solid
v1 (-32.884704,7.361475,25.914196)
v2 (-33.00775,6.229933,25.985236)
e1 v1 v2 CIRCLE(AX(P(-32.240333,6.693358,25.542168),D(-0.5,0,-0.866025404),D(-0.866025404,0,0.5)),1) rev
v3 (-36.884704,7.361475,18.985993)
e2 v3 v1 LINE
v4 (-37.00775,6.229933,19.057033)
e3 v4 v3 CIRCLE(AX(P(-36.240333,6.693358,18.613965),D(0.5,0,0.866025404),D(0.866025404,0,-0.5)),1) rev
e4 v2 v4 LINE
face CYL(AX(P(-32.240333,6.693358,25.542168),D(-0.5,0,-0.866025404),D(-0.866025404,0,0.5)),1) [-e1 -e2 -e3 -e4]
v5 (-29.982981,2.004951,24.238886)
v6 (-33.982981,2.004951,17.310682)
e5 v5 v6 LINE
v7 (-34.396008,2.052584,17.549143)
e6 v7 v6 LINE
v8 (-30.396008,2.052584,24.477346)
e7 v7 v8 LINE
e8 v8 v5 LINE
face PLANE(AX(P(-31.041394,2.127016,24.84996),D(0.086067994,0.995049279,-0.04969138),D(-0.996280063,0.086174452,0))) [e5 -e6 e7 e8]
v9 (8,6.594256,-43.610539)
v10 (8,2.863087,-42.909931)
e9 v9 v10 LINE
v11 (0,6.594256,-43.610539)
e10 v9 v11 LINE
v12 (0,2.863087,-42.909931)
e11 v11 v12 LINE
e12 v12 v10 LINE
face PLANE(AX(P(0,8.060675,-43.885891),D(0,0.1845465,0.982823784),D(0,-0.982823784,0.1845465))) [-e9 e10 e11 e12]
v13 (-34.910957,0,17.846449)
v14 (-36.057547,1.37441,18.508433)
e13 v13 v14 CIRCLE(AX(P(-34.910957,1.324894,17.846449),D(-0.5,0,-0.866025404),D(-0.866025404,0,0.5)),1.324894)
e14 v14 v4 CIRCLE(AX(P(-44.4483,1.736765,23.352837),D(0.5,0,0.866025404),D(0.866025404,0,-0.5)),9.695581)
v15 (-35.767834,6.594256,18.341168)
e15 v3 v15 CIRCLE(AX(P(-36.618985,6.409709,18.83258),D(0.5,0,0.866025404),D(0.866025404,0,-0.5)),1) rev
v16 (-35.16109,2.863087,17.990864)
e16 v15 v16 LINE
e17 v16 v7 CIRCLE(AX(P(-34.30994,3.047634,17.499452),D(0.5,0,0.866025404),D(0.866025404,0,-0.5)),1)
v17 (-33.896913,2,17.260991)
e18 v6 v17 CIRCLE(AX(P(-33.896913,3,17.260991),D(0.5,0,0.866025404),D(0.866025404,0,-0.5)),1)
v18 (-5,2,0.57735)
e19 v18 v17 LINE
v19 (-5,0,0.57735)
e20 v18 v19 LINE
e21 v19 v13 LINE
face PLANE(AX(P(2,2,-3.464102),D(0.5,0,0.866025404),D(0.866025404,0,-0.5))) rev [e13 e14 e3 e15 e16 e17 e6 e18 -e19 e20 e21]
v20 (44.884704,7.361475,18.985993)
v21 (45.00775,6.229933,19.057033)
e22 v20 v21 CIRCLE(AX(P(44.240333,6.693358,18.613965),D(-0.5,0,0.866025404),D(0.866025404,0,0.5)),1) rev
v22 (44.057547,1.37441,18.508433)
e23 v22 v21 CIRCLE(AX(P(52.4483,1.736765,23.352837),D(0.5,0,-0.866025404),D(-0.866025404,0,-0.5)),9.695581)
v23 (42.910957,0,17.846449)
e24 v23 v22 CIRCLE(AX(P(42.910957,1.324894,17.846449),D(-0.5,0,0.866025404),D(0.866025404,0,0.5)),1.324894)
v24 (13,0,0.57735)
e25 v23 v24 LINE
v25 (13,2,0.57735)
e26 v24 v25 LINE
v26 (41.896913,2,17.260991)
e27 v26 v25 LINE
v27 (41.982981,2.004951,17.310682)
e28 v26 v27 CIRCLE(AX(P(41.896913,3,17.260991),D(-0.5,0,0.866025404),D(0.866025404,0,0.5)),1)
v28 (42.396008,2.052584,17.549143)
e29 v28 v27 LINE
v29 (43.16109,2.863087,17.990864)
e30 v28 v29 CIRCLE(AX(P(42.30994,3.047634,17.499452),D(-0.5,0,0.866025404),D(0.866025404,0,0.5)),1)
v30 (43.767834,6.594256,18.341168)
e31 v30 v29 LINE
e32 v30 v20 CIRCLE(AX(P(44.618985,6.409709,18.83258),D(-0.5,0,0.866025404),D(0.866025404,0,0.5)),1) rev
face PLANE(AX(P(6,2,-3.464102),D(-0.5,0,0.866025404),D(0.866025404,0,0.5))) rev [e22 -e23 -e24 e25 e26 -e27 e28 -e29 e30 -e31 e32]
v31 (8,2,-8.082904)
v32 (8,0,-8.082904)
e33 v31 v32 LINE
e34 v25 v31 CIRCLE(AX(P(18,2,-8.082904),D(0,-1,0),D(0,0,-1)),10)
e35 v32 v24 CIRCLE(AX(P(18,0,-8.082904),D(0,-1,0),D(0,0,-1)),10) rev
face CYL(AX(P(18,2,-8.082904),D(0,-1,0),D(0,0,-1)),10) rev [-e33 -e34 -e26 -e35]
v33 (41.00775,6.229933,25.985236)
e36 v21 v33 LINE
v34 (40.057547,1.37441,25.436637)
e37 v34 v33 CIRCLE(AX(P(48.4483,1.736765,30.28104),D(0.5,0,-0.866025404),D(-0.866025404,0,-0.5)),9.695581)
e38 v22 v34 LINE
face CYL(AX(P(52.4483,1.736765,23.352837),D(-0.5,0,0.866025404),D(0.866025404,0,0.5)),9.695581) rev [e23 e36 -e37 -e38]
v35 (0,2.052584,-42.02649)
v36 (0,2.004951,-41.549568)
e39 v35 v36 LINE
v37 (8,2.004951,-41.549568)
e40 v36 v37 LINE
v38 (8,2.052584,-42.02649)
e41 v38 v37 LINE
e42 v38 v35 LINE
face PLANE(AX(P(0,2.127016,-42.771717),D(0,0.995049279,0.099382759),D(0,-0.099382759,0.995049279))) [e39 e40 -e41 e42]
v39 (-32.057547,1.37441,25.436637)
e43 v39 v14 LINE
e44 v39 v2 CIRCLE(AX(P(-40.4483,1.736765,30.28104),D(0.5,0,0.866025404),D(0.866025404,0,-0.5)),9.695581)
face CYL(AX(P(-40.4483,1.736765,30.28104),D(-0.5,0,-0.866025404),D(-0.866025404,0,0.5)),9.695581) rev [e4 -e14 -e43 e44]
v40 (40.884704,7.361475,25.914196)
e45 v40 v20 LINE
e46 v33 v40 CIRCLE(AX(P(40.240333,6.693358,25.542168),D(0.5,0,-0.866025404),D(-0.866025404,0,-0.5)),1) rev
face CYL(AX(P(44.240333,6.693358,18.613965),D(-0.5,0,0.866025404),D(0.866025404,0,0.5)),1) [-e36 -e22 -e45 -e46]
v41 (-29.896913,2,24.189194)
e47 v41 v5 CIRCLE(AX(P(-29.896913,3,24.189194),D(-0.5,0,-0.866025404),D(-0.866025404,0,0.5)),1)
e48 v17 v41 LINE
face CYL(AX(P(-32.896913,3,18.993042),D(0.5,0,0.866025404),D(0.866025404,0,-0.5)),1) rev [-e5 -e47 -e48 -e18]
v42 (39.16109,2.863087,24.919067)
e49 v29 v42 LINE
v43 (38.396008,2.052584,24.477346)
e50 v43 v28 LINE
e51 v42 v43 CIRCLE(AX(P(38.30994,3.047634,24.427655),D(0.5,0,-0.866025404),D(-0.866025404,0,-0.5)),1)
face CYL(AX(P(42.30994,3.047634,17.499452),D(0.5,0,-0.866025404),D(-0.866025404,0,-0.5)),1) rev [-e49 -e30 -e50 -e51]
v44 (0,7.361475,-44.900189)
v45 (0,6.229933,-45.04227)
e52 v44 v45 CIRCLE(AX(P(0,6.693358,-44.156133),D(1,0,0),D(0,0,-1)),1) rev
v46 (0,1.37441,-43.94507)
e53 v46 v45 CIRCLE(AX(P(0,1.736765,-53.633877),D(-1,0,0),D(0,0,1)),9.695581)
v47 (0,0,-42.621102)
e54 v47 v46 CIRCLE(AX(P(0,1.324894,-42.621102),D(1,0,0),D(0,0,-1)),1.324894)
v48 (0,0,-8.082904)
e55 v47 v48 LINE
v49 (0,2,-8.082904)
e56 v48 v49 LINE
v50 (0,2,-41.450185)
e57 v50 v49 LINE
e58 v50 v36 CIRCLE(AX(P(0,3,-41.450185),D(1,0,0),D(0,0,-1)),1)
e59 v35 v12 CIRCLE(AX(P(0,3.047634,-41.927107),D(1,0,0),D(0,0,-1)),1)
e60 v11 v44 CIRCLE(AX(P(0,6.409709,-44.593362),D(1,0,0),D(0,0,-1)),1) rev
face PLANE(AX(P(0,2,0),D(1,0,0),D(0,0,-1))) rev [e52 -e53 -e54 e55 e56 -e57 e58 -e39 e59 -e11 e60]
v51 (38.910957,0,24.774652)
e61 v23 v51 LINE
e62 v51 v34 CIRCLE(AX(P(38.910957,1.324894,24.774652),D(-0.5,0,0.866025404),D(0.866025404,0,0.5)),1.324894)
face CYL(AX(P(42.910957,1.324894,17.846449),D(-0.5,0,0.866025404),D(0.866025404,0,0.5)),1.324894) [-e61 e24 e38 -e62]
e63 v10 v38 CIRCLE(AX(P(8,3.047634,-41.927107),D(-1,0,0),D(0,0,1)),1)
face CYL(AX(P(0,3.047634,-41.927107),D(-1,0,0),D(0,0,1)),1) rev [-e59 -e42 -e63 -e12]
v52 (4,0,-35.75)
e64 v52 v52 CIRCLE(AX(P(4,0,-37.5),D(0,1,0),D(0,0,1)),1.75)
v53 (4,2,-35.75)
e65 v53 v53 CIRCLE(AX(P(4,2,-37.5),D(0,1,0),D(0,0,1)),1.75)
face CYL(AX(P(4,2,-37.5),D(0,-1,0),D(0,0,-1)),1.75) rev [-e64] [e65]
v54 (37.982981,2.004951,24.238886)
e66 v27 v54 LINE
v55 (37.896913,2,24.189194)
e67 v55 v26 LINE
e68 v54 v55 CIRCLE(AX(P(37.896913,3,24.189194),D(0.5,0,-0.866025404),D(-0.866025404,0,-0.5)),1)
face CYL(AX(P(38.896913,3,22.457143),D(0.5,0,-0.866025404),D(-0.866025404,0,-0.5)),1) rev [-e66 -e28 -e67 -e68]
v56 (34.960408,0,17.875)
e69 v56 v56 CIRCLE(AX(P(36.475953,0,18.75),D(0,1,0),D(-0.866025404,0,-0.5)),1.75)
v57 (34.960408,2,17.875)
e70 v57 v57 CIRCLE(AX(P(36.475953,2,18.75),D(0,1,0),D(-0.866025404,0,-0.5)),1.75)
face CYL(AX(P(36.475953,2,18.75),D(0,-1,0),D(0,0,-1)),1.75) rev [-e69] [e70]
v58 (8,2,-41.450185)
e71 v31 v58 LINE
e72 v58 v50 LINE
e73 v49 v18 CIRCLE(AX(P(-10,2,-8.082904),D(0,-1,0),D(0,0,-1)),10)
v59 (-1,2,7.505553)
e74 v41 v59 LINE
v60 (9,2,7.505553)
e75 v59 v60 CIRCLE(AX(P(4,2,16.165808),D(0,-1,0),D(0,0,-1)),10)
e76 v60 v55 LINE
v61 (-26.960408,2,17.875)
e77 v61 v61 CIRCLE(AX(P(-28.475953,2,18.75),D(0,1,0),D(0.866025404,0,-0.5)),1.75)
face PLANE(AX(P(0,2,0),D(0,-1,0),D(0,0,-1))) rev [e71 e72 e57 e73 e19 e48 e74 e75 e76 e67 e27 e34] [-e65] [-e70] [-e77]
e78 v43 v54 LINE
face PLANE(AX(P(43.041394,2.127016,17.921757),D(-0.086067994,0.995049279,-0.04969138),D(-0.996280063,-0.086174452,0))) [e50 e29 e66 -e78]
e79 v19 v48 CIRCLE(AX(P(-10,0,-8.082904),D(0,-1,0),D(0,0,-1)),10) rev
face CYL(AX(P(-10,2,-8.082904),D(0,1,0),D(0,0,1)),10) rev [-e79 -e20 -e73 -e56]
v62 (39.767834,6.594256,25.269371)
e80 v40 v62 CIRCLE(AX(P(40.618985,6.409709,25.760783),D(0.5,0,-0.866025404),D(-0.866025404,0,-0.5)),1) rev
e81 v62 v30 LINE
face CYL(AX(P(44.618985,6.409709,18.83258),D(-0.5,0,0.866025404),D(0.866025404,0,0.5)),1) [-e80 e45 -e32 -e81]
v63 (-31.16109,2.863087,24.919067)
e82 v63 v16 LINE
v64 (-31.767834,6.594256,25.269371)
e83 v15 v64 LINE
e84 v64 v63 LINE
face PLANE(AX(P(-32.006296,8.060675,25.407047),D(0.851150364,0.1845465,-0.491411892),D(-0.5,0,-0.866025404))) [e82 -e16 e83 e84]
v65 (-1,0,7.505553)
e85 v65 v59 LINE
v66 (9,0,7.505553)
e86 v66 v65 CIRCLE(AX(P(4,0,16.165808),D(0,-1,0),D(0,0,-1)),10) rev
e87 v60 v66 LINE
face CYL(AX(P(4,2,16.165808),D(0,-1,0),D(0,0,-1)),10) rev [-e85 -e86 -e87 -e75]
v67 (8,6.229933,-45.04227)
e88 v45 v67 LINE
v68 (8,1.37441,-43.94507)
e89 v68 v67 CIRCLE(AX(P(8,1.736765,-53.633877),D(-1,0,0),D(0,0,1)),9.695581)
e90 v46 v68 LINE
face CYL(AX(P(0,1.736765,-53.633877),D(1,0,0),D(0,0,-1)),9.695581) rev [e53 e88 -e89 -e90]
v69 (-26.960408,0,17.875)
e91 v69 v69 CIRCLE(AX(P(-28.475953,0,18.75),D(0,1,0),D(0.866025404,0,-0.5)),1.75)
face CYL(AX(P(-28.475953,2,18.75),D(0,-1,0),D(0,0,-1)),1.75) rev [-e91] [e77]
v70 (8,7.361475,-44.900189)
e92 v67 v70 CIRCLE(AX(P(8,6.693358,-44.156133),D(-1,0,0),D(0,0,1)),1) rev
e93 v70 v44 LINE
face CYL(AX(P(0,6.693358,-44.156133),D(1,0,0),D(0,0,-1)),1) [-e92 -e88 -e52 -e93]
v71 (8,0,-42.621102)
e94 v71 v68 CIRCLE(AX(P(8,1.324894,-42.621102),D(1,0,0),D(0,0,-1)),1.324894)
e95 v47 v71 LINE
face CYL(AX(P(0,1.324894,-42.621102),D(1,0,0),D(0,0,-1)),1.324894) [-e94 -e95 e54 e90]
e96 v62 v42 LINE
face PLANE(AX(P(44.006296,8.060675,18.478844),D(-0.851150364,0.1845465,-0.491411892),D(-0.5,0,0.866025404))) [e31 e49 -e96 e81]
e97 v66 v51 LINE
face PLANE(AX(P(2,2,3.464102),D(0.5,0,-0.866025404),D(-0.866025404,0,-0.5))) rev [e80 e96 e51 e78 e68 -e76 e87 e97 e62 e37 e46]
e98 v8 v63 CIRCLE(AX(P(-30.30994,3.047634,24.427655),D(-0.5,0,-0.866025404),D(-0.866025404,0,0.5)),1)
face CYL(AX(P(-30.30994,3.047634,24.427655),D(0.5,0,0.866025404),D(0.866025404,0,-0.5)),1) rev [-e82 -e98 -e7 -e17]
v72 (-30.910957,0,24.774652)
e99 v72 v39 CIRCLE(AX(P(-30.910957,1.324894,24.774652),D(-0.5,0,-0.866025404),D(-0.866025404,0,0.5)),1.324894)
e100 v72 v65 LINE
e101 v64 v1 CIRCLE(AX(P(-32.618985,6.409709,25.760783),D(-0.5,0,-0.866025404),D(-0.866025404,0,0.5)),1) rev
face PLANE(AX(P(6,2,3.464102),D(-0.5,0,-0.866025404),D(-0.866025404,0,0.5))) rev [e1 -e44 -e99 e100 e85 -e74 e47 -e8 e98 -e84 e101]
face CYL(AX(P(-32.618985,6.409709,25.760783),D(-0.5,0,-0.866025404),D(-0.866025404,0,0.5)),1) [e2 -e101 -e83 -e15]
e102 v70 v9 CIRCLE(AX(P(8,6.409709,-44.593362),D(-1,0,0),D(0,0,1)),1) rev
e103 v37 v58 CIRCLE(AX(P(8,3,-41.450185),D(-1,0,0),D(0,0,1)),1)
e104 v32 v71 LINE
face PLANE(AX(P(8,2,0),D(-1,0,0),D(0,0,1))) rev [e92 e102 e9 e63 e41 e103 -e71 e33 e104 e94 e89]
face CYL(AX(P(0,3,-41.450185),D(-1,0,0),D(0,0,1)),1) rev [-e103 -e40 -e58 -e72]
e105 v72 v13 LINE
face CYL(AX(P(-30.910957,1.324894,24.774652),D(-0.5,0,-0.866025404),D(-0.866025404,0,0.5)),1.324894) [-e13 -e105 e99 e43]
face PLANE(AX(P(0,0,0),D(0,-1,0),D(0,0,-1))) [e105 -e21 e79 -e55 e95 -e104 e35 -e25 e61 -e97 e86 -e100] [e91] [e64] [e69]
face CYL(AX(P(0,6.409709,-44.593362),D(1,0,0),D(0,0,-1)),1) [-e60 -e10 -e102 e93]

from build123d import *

# Parameters (mm, degrees)
SKETCH1_W                = 8
SKETCH1_H                = 41.5
SKETCH1_R                = 1.75
BOSS_EXTRUDE2_DEPTH      = 2
CIRPATTERN1_COUNT        = 3
BOSS_EXTRUDE4_DEPTH      = 4
FILLET4_R                = 1
FILLET5_R                = 1
CIRPATTERN2_COUNT        = 3
FILLET4_OF_CIRPATTERN2_R = 1
FILLET5_OF_CIRPATTERN2_R = 1
FILLET6_R                = 10


with BuildPart() as part:
    # Sketch1 → Boss-Extrude2 (new body)
    with BuildSketch(Plane(origin=(0, 0, 0), x_dir=(1, 0, 0), z_dir=(0, 1, 0))):
        with Locations((4, 20.75)):
            Rectangle(SKETCH1_W, SKETCH1_H)
        with Locations(Location((4, 37.5, 0), (0, 0, 270))):
            Circle(SKETCH1_R, mode=Mode.SUBTRACT)
    boss_extrude2 = extrude(amount=BOSS_EXTRUDE2_DEPTH)

    # CirPattern1: Boss-Extrude2 ×3 about axis
    cirpattern1_axis = Axis((4, 0, 0), (0, 1, 0))
    for i in range(1, CIRPATTERN1_COUNT):
        add(boss_extrude2.rotate(cirpattern1_axis, i * 360 / CIRPATTERN1_COUNT))

    # Sketch8 → Boss-Extrude4 (add, symmetric)
    with BuildSketch(Plane(origin=(4, 0, 0), x_dir=(0, 0, -1), z_dir=(1, 0, 0))):
        with BuildLine():
            Line((41.5, 0), (42.621101534, 0))
            ThreePointArc((42.621101534, 0), (43.575288985, 0.405725605), (43.945070079, 1.374409713))
            ThreePointArc((43.945070079, 1.374409713), (44.287115262, 4.314035864), (45.5, 7.013537193))
            Line((45.5, 7.013537193), (43.885890552, 8.06067472))
            Line((43.885890552, 8.06067472), (42.771717246, 2.127015587))
            Line((42.771717246, 2.127015587), (41.5, 2))
            Line((41.5, 2), (41.5, 0))
        make_face()
    boss_extrude4 = extrude(amount=BOSS_EXTRUDE4_DEPTH, both=True)

    # Fillet4
    # the kernel refuses this fillet: 1 mm, written as the material it takes off along each edge
    with BuildSketch(Plane(origin=(11.730116112, 8.06067472, -43.885890552), x_dir=(0, -0.9828237835068792, 0.1845464997587953), z_dir=(-1, 0, 0))) as fillet4_piece_1:
        with BuildLine():
            CenterArc((FILLET4_R * 1.49204644486, -FILLET4_R), FILLET4_R, 90, 112.338398351)
            Line((FILLET4_R * 0.567091237268, -FILLET4_R * 1.38007612915), (0, 0))
            Line((0, 0), (FILLET4_R * 1.49204644486, 0))
        make_face()
    extrude(amount=15.460232224, mode=Mode.SUBTRACT)
    with BuildSketch(Plane(origin=(-2.382872769, 7.013537193, -45.5), x_dir=(0, 0.5442451052621637, 0.8389262574256311), z_dir=(1, 0, 0))) as fillet4_piece_2:
        with BuildLine():
            CenterArc((0.953149108, 1), FILLET4_R, 185.36479385, 84.63520615)
            ThreePointArc((-0.042470495, 0.906503441), (-0.010623444, 0.453748893), (0, 0))
            Line((0, 0), (0.953149108, 0))
        make_face()
    extrude(amount=12.765745538, mode=Mode.SUBTRACT)

    # Fillet5
    # the kernel refuses this fillet: 1 mm, written as the material it adds along each edge
    with BuildSketch(Plane(origin=(8, 2, -41.5), x_dir=(0, 0, 1), z_dir=(-1, 0, 0))) as fillet5_piece_1:
        with BuildLine():
            CenterArc((FILLET5_R * 0.0498146888591, FILLET5_R), FILLET5_R, 264.296371881, 5.703628119)
            Line((-FILLET5_R * 0.0495680702218, FILLET5_R * 0.00495072122158), (0, 0))
            Line((0, 0), (FILLET5_R * 0.0498146888591, 0))
        make_face()
    extrude(amount=8)
    with BuildSketch(Plane(origin=(8, 2.127015587, -42.771717246), x_dir=(0, 0.9828237835068792, -0.18454649975879509), z_dir=(-1, 0, 0))) as fillet5_piece_2:
        with BuildLine():
            CenterArc((FILLET5_R * 0.748935389987, -FILLET5_R), FILLET5_R, 90, 73.66167838)
            Line((-FILLET5_R * 0.210681966633, -FILLET5_R * 0.718691399219), (0, 0))
            Line((0, 0), (FILLET5_R * 0.748935389987, 0))
        make_face()
    extrude(amount=8)

    # CirPattern2: Boss-Extrude4 ×3 about axis
    cirpattern2_axis = Axis((4, 0, 0), (0, 1, 0))
    for i in range(1, CIRPATTERN2_COUNT):
        add(boss_extrude4.rotate(cirpattern2_axis, i * 360 / CIRPATTERN2_COUNT))

    # Fillet4 of CirPattern2
    # the kernel refuses this fillet: 1 mm, written as the material it takes off along each edge
    with BuildSketch(Plane(origin=(-37.871354141, 8.06067472, 15.248468348), x_dir=(-0.7265314508324002, -0.5442451052621637, 0.4194631287128154), z_dir=(0.49999999999999983, 0, 0.8660254037844388))) as fillet4_of_cirpattern2_piece_1:
        with BuildLine():
            CenterArc((FILLET4_OF_CIRPATTERN2_R * 1.49204644486, FILLET4_OF_CIRPATTERN2_R), FILLET4_OF_CIRPATTERN2_R, 157.661601649, 112.338398351)
            Line((FILLET4_OF_CIRPATTERN2_R * 0.567091237268, FILLET4_OF_CIRPATTERN2_R * 1.38007612915), (0, 0))
            Line((0, 0), (FILLET4_OF_CIRPATTERN2_R * 1.49204644486, 0))
        make_face()
    extrude(amount=15.460232224, mode=Mode.SUBTRACT)
    with BuildSketch(Plane(origin=(-32.212719488, 7.013537193, 28.277729967), x_dir=(0.43681230013054545, -0.8634774766062033, -0.2521936990657099), z_dir=(-0.49999999999999983, 0, -0.8660254037844388))) as fillet4_of_cirpattern2_piece_2:
        with BuildLine():
            CenterArc((0.954297344, -0.9989043), FILLET4_OF_CIRPATTERN2_R, 92.682396925, 84.63520615)
            Line((-0.044606957, -0.952104742), (0, 0))
            ThreePointArc((0, 0), (0.453748893, -0.010623444), (0.907497786, 0))
        make_face()
    extrude(amount=12.765745538, mode=Mode.SUBTRACT)
    with BuildSketch(Plane(origin=(38.141238029, 8.06067472, 28.637422203), x_dir=(-0.15982195697061236, -0.9828237835068798, -0.09227324987939595), z_dir=(0.5000000000000004, 0, -0.8660254037844384))) as fillet4_of_cirpattern2_piece_3:
        with BuildLine():
            CenterArc((FILLET4_OF_CIRPATTERN2_R * 1.49204644486, -FILLET4_OF_CIRPATTERN2_R), FILLET4_OF_CIRPATTERN2_R, 90, 112.338398351)
            Line((FILLET4_OF_CIRPATTERN2_R * 0.567091237268, -FILLET4_OF_CIRPATTERN2_R * 1.38007612915), (0, 0))
            Line((0, 0), (FILLET4_OF_CIRPATTERN2_R * 1.49204644486, 0))
        make_face()
    extrude(amount=15.460232224, mode=Mode.SUBTRACT)
    with BuildSketch(Plane(origin=(46.595592257, 7.013537193, 17.222270033), x_dir=(-0.7265314508324002, 0.5442451052621633, -0.4194631287128161), z_dir=(-0.5000000000000004, 0, 0.8660254037844384))) as fillet4_of_cirpattern2_piece_4:
        with BuildLine():
            CenterArc((0.953149108, 1), FILLET4_OF_CIRPATTERN2_R, 185.36479385, 84.63520615)
            ThreePointArc((-0.042470495, 0.906503441), (-0.010623444, 0.453748893), (0, 0))
            Line((0, 0), (0.953149108, 0))
        make_face()
    extrude(amount=12.765745538, mode=Mode.SUBTRACT)

    # Fillet5 of CirPattern2
    # the kernel refuses this fillet: 1 mm, written as the material it adds along each edge
    with BuildSketch(Plane(origin=(-33.940054257, 2, 17.285898385), x_dir=(0.8660254037844387, 0, -0.4999999999999998), z_dir=(0.49999999999999983, 0, 0.8660254037844388)), Plane(origin=(37.940054257, 2, 24.214101615), x_dir=(-0.8660254037844384, 0, -0.5000000000000004), z_dir=(0.5000000000000004, 0, -0.8660254037844384))) as fillet5_of_cirpattern2_piece_1:
        with BuildLine():
            CenterArc((FILLET5_OF_CIRPATTERN2_R * 0.0498146888591, FILLET5_OF_CIRPATTERN2_R), FILLET5_OF_CIRPATTERN2_R, 264.296371881, 5.703628119)
            Line((-FILLET5_OF_CIRPATTERN2_R * 0.0495680702218, FILLET5_OF_CIRPATTERN2_R * 0.00495072122158), (0, 0))
            Line((0, 0), (FILLET5_OF_CIRPATTERN2_R * 0.0498146888591, 0))
        make_face()
    extrude(amount=8)
    with BuildSketch(Plane(origin=(-35.041393699, 2.127015587, 17.921757008), x_dir=(0.861737953439498, -0.0993827590809451, -0.4975246393892111), z_dir=(0.49999999999999983, 0, 0.8660254037844388)), Plane(origin=(39.041393699, 2.127015587, 24.849960238), x_dir=(-0.8617379534394976, -0.09938275908094509, -0.49752463938921165), z_dir=(0.5000000000000004, 0, -0.8660254037844384))) as fillet5_of_cirpattern2_piece_2:
        with BuildLine():
            CenterArc((FILLET5_OF_CIRPATTERN2_R * 0.748935389987, FILLET5_OF_CIRPATTERN2_R), FILLET5_OF_CIRPATTERN2_R, 196.33832162, 73.66167838)
            Line((-FILLET5_OF_CIRPATTERN2_R * 0.210681966633, FILLET5_OF_CIRPATTERN2_R * 0.718691399219), (0, 0))
            Line((0, 0), (FILLET5_OF_CIRPATTERN2_R * 0.748935389987, 0))
        make_face()
    extrude(amount=8)

    # Fillet6
    fillet6_edges = [part.edges().sort_by_distance(p)[0] for p in [
        (8, 1, -2.309401077),
        (0, 1, -2.309401077),
        (4, 1, 4.618802154),
    ]]
    fillet(fillet6_edges, radius=FILLET6_R)


solid = part.part
